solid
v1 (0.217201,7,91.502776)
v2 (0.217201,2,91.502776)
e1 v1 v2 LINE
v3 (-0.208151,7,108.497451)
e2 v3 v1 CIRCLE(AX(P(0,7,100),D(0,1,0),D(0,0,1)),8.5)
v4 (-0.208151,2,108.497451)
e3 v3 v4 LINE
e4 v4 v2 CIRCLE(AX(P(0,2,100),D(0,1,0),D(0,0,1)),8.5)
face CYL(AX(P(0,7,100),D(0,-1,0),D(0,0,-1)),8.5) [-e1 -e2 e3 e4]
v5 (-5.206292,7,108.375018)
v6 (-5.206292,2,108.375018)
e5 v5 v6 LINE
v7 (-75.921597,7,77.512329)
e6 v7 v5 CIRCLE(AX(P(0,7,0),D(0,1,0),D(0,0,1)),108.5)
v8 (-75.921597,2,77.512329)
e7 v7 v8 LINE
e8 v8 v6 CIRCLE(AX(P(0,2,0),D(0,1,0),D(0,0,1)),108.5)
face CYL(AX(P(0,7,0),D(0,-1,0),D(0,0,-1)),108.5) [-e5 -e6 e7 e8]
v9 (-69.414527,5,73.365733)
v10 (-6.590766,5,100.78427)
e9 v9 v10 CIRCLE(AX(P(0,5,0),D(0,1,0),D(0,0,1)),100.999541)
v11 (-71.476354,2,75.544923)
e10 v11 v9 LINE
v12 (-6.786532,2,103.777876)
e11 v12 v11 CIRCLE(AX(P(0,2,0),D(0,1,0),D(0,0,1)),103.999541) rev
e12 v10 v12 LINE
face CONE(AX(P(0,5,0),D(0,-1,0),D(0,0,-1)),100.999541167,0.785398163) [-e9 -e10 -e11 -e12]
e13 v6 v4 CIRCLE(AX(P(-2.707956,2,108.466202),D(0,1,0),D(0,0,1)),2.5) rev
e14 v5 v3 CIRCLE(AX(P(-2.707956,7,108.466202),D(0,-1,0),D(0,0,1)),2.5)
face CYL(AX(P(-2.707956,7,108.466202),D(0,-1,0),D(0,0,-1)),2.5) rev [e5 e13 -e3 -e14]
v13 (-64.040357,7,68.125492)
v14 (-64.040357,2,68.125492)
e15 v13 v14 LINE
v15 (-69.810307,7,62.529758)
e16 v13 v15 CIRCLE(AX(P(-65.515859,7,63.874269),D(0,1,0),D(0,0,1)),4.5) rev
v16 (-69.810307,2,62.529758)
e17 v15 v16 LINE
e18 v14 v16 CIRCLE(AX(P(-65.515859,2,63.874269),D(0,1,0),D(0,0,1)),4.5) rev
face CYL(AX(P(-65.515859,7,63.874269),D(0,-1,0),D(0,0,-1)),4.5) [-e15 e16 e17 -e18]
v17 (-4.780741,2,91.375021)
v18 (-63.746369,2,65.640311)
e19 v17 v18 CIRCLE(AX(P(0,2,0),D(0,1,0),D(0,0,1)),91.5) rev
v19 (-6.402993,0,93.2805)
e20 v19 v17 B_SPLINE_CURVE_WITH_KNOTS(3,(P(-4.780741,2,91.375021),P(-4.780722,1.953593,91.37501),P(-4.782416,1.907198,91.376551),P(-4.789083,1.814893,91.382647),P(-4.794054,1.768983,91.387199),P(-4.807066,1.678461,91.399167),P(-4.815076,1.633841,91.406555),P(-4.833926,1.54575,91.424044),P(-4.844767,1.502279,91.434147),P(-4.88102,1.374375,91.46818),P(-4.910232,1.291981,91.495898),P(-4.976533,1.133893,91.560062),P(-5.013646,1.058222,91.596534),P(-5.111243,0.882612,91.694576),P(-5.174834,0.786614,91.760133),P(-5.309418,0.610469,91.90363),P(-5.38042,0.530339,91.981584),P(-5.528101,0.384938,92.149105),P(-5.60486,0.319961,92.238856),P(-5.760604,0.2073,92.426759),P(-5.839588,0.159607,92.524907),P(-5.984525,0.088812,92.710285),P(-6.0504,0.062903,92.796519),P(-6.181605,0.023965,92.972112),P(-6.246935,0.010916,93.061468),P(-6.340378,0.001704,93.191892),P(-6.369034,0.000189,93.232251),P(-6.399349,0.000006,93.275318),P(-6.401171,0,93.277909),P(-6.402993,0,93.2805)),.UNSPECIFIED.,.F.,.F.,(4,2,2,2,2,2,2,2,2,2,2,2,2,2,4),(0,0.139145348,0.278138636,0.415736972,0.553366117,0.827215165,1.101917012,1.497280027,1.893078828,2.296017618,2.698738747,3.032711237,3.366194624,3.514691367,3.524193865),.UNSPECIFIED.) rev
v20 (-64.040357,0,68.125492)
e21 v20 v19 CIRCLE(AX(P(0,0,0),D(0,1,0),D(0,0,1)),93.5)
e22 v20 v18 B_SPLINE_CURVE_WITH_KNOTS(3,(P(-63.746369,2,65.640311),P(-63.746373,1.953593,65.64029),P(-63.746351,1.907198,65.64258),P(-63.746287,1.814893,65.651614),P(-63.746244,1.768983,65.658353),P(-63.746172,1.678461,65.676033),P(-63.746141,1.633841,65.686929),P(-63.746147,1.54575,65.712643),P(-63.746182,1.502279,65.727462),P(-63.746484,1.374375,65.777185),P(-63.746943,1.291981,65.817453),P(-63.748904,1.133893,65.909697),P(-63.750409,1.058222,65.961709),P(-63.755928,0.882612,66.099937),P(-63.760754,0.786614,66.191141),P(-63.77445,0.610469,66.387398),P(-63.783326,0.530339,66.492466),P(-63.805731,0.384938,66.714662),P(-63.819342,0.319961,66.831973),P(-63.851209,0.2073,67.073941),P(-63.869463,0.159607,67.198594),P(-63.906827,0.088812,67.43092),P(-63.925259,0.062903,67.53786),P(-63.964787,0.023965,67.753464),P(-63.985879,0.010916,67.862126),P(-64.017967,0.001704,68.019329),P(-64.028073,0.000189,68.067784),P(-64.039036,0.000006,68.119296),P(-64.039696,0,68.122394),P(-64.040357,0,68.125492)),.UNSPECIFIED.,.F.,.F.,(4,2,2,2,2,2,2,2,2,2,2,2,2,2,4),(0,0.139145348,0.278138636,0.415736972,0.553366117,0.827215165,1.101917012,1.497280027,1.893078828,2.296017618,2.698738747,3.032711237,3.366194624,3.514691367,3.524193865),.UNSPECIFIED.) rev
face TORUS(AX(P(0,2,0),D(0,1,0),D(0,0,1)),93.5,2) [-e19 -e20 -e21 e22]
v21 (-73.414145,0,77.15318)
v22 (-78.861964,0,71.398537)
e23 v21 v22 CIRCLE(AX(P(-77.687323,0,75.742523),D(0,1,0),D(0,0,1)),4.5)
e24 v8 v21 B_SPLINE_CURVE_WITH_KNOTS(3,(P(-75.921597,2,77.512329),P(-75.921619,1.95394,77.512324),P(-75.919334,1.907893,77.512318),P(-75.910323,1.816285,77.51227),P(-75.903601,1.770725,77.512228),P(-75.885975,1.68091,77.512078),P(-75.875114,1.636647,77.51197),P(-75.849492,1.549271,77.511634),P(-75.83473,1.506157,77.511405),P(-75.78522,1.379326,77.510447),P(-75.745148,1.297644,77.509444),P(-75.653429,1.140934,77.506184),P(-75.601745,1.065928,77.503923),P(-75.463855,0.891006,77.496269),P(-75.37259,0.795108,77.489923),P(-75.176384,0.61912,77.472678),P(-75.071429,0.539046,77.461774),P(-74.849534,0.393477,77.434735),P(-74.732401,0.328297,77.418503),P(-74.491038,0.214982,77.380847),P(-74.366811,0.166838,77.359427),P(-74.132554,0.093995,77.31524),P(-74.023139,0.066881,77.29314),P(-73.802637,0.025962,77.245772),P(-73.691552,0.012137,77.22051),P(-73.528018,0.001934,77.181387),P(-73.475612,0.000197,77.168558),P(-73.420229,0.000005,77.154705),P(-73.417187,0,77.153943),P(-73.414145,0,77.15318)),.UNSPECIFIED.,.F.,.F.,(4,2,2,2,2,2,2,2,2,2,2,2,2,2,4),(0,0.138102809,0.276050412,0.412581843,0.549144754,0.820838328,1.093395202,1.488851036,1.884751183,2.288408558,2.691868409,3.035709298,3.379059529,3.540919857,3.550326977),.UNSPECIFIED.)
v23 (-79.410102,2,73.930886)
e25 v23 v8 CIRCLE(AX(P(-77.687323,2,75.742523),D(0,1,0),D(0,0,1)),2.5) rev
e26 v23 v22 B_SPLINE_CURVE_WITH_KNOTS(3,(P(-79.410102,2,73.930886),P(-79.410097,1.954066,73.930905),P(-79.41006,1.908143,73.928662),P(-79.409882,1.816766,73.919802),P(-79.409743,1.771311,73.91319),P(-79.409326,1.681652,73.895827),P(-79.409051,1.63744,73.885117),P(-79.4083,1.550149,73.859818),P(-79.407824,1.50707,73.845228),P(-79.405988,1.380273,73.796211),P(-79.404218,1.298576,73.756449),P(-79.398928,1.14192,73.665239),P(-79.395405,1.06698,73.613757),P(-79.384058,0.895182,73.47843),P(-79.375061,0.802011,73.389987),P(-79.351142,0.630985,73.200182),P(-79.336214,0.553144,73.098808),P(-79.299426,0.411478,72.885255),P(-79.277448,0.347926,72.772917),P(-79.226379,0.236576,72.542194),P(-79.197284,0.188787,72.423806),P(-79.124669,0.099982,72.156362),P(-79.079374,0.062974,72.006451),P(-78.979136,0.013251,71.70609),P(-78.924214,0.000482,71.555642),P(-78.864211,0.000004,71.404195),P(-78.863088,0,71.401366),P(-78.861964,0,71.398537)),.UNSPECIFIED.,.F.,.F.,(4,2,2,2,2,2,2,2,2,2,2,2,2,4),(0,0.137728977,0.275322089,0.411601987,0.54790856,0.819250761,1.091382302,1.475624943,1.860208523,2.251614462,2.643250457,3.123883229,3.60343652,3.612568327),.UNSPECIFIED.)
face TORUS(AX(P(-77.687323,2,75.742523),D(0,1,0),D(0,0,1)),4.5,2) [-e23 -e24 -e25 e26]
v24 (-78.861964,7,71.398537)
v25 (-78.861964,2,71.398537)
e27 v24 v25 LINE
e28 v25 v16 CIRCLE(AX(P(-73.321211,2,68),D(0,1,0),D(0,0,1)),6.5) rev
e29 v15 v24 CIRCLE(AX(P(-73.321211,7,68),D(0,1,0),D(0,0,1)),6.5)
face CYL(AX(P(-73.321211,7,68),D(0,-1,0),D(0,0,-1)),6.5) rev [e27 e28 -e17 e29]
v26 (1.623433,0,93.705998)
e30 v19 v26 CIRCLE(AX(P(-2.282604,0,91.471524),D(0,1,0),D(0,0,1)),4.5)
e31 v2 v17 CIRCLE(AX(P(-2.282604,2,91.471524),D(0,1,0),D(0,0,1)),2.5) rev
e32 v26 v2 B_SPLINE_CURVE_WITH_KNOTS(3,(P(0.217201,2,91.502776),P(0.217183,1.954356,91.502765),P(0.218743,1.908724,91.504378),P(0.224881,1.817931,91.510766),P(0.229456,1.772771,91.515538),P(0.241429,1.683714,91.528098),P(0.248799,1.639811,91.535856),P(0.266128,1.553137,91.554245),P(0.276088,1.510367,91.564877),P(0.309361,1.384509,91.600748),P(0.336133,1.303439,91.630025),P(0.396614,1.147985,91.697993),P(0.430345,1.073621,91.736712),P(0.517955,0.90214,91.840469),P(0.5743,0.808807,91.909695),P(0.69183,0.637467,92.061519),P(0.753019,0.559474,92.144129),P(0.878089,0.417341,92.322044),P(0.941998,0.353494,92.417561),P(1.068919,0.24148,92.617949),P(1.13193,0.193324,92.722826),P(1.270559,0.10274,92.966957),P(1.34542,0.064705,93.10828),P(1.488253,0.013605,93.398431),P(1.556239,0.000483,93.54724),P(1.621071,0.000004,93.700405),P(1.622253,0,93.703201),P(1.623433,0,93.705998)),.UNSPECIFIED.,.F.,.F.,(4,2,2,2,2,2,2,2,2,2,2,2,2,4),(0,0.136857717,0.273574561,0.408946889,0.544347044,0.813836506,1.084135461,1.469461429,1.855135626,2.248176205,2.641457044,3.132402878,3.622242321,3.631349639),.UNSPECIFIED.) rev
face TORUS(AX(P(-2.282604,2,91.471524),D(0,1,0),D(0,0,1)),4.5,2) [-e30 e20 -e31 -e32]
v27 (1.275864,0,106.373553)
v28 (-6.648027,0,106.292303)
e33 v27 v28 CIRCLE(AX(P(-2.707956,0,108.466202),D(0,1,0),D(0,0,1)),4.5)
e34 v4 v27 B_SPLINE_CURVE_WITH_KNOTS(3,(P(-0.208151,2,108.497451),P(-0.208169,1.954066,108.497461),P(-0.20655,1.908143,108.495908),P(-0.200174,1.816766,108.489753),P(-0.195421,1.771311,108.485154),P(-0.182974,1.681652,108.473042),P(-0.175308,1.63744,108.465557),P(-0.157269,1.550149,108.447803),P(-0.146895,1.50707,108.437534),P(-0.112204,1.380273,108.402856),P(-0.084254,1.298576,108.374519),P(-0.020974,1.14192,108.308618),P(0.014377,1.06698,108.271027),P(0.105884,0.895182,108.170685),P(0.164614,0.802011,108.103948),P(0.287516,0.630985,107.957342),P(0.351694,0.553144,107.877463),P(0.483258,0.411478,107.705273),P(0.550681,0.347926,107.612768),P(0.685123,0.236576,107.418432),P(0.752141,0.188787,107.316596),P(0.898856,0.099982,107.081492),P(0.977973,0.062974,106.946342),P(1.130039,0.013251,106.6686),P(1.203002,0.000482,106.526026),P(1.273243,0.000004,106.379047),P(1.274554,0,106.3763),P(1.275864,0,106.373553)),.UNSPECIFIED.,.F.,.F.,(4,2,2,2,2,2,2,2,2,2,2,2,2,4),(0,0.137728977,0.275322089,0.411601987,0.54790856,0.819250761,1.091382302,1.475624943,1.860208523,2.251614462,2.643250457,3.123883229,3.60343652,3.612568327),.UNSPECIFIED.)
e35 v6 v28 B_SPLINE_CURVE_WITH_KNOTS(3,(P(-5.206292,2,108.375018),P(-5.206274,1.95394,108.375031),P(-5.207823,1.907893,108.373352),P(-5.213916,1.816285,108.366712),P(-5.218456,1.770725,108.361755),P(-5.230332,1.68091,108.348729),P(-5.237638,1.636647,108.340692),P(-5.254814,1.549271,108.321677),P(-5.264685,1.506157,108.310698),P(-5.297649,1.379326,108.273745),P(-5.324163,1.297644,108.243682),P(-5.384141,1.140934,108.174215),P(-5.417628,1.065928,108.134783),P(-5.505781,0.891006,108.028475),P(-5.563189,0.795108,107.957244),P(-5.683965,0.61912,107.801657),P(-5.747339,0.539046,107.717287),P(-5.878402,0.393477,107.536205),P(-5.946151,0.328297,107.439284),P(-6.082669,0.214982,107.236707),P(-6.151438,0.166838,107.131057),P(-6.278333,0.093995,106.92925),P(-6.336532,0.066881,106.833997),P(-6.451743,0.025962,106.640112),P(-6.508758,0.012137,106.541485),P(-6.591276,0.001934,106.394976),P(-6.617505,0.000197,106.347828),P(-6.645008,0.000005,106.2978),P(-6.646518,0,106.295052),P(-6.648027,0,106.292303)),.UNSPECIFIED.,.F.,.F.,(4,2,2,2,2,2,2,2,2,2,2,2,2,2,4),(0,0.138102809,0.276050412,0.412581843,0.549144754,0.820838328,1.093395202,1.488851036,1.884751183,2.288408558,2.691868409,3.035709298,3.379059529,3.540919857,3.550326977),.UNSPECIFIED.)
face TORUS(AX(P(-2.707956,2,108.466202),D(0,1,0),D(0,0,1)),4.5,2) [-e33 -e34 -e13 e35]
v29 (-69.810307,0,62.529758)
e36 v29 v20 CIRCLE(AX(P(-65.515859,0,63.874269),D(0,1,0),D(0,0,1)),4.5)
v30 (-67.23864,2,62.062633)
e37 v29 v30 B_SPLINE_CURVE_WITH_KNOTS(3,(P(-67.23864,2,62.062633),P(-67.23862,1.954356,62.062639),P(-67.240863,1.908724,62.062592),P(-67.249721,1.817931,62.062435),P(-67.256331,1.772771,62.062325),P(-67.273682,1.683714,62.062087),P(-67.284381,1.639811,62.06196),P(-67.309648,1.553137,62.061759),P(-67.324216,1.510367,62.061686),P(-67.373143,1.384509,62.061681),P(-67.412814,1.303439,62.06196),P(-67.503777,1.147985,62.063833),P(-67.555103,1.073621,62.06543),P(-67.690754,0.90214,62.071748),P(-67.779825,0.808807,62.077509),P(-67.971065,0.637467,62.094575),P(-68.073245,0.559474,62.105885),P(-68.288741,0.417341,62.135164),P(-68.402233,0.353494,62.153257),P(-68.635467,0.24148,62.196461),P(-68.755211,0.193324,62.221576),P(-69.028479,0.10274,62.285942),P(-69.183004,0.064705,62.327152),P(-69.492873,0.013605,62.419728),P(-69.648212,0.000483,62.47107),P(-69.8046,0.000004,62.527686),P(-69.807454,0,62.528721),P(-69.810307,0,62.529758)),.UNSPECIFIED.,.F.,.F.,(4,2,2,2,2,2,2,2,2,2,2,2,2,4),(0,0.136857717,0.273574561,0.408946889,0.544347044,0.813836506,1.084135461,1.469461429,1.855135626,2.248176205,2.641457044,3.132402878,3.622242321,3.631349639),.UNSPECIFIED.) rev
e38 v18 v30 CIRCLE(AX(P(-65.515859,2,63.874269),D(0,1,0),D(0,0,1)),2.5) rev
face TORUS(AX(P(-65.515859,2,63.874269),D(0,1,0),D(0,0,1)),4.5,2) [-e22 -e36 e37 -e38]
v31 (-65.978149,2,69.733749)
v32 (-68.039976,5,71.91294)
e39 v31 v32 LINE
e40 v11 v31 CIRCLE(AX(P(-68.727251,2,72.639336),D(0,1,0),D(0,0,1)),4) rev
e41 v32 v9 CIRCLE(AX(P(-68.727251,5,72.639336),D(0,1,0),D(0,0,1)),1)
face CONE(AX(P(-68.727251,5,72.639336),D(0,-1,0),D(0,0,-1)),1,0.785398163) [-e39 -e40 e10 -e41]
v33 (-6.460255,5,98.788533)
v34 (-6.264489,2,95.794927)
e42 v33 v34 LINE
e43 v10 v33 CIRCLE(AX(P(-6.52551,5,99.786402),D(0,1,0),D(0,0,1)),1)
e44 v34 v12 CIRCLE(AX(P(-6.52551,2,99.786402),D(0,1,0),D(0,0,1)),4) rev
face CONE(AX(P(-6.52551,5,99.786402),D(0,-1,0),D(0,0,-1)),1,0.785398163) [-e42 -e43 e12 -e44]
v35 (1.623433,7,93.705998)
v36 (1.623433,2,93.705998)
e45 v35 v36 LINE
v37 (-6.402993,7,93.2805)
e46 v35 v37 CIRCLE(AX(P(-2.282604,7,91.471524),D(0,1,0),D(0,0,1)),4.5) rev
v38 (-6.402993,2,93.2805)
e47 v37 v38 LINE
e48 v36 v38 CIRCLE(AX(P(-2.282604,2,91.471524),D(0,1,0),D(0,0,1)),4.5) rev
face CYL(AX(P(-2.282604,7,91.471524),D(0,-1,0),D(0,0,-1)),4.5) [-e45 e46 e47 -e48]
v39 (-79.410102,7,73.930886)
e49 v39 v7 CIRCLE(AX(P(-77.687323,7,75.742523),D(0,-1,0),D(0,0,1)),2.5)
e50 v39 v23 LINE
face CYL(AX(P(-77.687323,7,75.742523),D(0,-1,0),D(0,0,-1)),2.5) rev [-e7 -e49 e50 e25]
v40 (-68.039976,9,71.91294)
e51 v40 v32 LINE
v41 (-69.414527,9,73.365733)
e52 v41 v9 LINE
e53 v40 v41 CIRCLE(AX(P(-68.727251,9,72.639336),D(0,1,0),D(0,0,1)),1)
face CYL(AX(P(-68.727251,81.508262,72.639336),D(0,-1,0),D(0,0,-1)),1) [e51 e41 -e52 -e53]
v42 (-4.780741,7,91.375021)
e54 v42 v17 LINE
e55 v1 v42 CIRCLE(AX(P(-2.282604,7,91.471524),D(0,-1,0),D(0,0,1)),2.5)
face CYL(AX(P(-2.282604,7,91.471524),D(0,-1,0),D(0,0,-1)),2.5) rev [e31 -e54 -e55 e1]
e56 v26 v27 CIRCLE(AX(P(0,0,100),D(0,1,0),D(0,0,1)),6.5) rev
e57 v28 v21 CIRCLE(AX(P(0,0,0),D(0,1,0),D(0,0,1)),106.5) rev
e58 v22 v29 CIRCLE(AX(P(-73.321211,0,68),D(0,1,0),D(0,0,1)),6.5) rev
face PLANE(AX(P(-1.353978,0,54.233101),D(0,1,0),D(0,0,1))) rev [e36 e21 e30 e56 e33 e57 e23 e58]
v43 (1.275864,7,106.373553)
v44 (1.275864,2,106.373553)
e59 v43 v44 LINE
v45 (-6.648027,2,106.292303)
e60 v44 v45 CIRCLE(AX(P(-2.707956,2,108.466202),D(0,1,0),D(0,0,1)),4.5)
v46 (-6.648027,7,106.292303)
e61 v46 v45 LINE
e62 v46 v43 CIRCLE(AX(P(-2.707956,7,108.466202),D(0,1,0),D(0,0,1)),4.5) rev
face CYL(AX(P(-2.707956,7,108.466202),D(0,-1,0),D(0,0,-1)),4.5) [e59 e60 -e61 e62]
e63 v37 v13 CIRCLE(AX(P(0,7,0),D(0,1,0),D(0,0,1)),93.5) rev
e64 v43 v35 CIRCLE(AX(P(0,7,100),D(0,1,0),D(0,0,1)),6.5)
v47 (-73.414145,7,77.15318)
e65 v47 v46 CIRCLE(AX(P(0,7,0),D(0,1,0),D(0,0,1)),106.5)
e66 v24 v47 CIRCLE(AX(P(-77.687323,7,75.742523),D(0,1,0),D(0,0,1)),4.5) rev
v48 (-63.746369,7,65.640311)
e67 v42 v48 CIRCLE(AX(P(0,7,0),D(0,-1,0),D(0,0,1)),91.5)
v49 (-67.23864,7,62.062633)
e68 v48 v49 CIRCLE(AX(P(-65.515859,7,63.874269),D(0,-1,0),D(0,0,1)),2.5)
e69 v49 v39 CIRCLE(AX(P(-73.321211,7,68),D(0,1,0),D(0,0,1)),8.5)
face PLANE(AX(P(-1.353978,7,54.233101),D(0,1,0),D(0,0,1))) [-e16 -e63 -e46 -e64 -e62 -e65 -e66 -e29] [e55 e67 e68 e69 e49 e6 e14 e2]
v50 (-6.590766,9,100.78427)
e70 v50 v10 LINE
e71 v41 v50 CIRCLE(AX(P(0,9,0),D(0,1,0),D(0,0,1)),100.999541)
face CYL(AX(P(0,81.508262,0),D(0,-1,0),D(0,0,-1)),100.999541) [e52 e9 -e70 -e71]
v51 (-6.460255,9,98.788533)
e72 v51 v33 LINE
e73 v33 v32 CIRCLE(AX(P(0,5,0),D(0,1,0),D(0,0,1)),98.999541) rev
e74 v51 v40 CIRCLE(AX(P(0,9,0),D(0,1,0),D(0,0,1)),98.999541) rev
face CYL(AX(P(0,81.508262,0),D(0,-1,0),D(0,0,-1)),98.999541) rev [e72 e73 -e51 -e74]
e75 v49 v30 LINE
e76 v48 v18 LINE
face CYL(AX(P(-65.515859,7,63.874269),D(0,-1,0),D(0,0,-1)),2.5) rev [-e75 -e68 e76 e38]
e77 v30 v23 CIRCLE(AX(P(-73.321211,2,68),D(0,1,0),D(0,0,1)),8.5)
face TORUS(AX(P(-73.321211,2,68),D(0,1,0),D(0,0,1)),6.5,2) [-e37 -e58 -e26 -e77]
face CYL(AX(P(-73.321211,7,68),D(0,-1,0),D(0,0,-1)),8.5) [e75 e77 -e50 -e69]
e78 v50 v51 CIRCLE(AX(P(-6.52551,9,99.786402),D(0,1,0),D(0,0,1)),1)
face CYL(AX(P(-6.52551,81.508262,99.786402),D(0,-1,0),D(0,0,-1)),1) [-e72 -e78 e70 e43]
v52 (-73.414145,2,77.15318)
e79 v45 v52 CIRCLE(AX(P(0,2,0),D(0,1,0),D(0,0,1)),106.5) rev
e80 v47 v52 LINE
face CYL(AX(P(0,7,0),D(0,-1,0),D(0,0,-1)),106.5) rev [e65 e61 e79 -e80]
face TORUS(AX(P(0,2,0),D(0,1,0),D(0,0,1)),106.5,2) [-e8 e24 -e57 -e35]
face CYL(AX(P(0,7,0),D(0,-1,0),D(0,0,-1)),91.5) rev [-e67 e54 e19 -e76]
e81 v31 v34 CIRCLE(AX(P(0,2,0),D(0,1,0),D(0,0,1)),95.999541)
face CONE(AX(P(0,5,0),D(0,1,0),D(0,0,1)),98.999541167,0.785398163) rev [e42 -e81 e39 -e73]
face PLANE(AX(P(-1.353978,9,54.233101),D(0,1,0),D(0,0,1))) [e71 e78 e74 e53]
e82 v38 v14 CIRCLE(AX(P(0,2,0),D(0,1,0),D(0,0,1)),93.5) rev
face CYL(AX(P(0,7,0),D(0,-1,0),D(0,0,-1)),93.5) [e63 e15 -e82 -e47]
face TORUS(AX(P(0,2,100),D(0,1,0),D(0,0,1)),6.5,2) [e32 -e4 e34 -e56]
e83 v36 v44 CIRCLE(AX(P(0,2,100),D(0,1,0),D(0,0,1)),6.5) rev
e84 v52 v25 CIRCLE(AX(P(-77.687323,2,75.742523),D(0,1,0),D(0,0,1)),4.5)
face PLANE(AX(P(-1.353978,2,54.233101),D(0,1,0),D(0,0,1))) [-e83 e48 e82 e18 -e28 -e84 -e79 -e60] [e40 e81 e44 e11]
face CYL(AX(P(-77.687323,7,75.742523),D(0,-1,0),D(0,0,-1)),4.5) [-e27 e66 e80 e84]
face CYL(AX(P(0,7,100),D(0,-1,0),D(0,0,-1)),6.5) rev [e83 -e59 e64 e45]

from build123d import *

# Parameters (mm, degrees)
BOSS_EXTRUDE1_DEPTH = 7
FILLET1_R           = 2
SHELL1_START        = 2
SHELL1_DEPTH        = 5
BOSS_EXTRUDE2_DEPTH = 7
CHAMFER2_SIZE       = 3


# Read off the part's stored shape, not the designer's step: Shell1
with BuildPart() as part:
    # Sketch2 → Boss-Extrude1 (new body)
    with BuildSketch(Plane(origin=(0, 0, 0), x_dir=(1, 0, 0), z_dir=(0, 1, 0))):
        with BuildLine():
            ThreePointArc((-0.208151075, -108.497450978), (8.497338934, -100.212675907), (0.217200678, -91.50277552))
            ThreePointArc((0.217200678, -91.50277552), (-2.346486536, -93.970707759), (-4.780740732, -91.375021303))
            ThreePointArc((-4.780740732, -91.375021303), (-36.6, -83.861135218), (-63.746368582, -65.640311491))
            ThreePointArc((-63.746368582, -65.640311491), (-67.304850182, -65.620553623), (-67.23863968, -62.062633186))
            ThreePointArc((-67.23863968, -62.062633186), (-79.255338145, -61.914267797), (-79.41010236, -73.930885555))
            ThreePointArc((-79.41010236, -73.930885555), (-75.896472672, -73.998145219), (-75.921596958, -77.512328796))
            ThreePointArc((-75.921596958, -77.512328796), (-43.4, -99.441892581), (-5.206292309, -108.375017972))
            ThreePointArc((-5.206292309, -108.375017972), (-2.646734863, -105.966951709), (-0.208151075, -108.497450978))
        make_face()
    extrude(amount=BOSS_EXTRUDE1_DEPTH)

    # Fillet1
    fillet1_edges = [part.edges().sort_by_distance(p)[0] for p in [
        (8.497338934, 0, 100.212675907),
        (-2.646734863, 0, 105.966951709),
        (-43.4, 0, 99.441892581),
        (-75.896472672, 0, 73.998145219),
        (-79.255338145, 0, 61.914267797),
        (-67.304850182, 0, 65.620553623),
        (-36.6, 0, 83.861135218),
        (-2.346486536, 0, 93.970707759),
    ]]
    fillet(fillet1_edges, radius=FILLET1_R)

    # Shell1 outline → Shell1 (cut)
    with BuildSketch(Plane(origin=(0, 0, 0), x_dir=(1, 0, 0), z_dir=(0, 1, 0)).offset(SHELL1_START)):
        with BuildLine():
            ThreePointArc((-73.41414546, -77.153180403), (-42.6, -97.608862303), (-6.648027376, -106.292303259))
            ThreePointArc((-6.648027376, -106.292303259), (-2.661816514, -103.96643854), (1.275863774, -106.373552513))
            ThreePointArc((1.275863774, -106.373552513), (6.497554678, -100.178278459), (1.623433321, -93.705997756))
            ThreePointArc((1.623433321, -93.705997756), (-2.520823959, -95.965214247), (-6.402993063, -93.280499998))
            ThreePointArc((-6.402993063, -93.280499998), (-37.4, -85.694165496), (-64.040357054, -68.12549206))
            ThreePointArc((-64.040357054, -68.12549206), (-68.648697048, -67.104644345), (-69.810307104, -62.529757501))
            ThreePointArc((-69.810307104, -62.529757501), (-77.870264225, -63.357143569), (-78.861964379, -71.398536938))
            ThreePointArc((-78.861964379, -71.398536938), (-74.419416665, -72.648854313), (-73.41414546, -77.153180403))
        make_face()
    extrude(amount=SHELL1_DEPTH, mode=Mode.SUBTRACT)

    # Sketch3 → Boss-Extrude2 (add)
    with BuildSketch(Plane(origin=(0, 2, 0), x_dir=(1, 0, 0), z_dir=(0, 1, 0))):
        with BuildLine():
            ThreePointArc((-69.414526923, -73.365732927), (-40.399816467, -92.56760851), (-6.590765621, -100.784270223))
            ThreePointArc((-6.590765621, -100.784270223), (-5.527641624, -99.85165703), (-6.460254818, -98.788533033))
            ThreePointArc((-6.460254818, -98.788533033), (-39.599816467, -90.734578232), (-68.039975591, -71.912939536))
            ThreePointArc((-68.039975591, -71.912939536), (-69.453647952, -71.952060566), (-69.414526923, -73.365732927))
        make_face()
    extrude(amount=BOSS_EXTRUDE2_DEPTH)

    # Chamfer2
    chamfer2_edges = [part.edges().sort_by_distance(p)[0] for p in [
        (-69.453647952, 2, 71.952060566),
        (-40.399816467, 2, 92.56760851),
        (-5.527641624, 2, 99.85165703),
        (-39.599816467, 2, 90.734578232),
    ]]
    chamfer(chamfer2_edges, length=CHAMFER2_SIZE)


solid = part.part
